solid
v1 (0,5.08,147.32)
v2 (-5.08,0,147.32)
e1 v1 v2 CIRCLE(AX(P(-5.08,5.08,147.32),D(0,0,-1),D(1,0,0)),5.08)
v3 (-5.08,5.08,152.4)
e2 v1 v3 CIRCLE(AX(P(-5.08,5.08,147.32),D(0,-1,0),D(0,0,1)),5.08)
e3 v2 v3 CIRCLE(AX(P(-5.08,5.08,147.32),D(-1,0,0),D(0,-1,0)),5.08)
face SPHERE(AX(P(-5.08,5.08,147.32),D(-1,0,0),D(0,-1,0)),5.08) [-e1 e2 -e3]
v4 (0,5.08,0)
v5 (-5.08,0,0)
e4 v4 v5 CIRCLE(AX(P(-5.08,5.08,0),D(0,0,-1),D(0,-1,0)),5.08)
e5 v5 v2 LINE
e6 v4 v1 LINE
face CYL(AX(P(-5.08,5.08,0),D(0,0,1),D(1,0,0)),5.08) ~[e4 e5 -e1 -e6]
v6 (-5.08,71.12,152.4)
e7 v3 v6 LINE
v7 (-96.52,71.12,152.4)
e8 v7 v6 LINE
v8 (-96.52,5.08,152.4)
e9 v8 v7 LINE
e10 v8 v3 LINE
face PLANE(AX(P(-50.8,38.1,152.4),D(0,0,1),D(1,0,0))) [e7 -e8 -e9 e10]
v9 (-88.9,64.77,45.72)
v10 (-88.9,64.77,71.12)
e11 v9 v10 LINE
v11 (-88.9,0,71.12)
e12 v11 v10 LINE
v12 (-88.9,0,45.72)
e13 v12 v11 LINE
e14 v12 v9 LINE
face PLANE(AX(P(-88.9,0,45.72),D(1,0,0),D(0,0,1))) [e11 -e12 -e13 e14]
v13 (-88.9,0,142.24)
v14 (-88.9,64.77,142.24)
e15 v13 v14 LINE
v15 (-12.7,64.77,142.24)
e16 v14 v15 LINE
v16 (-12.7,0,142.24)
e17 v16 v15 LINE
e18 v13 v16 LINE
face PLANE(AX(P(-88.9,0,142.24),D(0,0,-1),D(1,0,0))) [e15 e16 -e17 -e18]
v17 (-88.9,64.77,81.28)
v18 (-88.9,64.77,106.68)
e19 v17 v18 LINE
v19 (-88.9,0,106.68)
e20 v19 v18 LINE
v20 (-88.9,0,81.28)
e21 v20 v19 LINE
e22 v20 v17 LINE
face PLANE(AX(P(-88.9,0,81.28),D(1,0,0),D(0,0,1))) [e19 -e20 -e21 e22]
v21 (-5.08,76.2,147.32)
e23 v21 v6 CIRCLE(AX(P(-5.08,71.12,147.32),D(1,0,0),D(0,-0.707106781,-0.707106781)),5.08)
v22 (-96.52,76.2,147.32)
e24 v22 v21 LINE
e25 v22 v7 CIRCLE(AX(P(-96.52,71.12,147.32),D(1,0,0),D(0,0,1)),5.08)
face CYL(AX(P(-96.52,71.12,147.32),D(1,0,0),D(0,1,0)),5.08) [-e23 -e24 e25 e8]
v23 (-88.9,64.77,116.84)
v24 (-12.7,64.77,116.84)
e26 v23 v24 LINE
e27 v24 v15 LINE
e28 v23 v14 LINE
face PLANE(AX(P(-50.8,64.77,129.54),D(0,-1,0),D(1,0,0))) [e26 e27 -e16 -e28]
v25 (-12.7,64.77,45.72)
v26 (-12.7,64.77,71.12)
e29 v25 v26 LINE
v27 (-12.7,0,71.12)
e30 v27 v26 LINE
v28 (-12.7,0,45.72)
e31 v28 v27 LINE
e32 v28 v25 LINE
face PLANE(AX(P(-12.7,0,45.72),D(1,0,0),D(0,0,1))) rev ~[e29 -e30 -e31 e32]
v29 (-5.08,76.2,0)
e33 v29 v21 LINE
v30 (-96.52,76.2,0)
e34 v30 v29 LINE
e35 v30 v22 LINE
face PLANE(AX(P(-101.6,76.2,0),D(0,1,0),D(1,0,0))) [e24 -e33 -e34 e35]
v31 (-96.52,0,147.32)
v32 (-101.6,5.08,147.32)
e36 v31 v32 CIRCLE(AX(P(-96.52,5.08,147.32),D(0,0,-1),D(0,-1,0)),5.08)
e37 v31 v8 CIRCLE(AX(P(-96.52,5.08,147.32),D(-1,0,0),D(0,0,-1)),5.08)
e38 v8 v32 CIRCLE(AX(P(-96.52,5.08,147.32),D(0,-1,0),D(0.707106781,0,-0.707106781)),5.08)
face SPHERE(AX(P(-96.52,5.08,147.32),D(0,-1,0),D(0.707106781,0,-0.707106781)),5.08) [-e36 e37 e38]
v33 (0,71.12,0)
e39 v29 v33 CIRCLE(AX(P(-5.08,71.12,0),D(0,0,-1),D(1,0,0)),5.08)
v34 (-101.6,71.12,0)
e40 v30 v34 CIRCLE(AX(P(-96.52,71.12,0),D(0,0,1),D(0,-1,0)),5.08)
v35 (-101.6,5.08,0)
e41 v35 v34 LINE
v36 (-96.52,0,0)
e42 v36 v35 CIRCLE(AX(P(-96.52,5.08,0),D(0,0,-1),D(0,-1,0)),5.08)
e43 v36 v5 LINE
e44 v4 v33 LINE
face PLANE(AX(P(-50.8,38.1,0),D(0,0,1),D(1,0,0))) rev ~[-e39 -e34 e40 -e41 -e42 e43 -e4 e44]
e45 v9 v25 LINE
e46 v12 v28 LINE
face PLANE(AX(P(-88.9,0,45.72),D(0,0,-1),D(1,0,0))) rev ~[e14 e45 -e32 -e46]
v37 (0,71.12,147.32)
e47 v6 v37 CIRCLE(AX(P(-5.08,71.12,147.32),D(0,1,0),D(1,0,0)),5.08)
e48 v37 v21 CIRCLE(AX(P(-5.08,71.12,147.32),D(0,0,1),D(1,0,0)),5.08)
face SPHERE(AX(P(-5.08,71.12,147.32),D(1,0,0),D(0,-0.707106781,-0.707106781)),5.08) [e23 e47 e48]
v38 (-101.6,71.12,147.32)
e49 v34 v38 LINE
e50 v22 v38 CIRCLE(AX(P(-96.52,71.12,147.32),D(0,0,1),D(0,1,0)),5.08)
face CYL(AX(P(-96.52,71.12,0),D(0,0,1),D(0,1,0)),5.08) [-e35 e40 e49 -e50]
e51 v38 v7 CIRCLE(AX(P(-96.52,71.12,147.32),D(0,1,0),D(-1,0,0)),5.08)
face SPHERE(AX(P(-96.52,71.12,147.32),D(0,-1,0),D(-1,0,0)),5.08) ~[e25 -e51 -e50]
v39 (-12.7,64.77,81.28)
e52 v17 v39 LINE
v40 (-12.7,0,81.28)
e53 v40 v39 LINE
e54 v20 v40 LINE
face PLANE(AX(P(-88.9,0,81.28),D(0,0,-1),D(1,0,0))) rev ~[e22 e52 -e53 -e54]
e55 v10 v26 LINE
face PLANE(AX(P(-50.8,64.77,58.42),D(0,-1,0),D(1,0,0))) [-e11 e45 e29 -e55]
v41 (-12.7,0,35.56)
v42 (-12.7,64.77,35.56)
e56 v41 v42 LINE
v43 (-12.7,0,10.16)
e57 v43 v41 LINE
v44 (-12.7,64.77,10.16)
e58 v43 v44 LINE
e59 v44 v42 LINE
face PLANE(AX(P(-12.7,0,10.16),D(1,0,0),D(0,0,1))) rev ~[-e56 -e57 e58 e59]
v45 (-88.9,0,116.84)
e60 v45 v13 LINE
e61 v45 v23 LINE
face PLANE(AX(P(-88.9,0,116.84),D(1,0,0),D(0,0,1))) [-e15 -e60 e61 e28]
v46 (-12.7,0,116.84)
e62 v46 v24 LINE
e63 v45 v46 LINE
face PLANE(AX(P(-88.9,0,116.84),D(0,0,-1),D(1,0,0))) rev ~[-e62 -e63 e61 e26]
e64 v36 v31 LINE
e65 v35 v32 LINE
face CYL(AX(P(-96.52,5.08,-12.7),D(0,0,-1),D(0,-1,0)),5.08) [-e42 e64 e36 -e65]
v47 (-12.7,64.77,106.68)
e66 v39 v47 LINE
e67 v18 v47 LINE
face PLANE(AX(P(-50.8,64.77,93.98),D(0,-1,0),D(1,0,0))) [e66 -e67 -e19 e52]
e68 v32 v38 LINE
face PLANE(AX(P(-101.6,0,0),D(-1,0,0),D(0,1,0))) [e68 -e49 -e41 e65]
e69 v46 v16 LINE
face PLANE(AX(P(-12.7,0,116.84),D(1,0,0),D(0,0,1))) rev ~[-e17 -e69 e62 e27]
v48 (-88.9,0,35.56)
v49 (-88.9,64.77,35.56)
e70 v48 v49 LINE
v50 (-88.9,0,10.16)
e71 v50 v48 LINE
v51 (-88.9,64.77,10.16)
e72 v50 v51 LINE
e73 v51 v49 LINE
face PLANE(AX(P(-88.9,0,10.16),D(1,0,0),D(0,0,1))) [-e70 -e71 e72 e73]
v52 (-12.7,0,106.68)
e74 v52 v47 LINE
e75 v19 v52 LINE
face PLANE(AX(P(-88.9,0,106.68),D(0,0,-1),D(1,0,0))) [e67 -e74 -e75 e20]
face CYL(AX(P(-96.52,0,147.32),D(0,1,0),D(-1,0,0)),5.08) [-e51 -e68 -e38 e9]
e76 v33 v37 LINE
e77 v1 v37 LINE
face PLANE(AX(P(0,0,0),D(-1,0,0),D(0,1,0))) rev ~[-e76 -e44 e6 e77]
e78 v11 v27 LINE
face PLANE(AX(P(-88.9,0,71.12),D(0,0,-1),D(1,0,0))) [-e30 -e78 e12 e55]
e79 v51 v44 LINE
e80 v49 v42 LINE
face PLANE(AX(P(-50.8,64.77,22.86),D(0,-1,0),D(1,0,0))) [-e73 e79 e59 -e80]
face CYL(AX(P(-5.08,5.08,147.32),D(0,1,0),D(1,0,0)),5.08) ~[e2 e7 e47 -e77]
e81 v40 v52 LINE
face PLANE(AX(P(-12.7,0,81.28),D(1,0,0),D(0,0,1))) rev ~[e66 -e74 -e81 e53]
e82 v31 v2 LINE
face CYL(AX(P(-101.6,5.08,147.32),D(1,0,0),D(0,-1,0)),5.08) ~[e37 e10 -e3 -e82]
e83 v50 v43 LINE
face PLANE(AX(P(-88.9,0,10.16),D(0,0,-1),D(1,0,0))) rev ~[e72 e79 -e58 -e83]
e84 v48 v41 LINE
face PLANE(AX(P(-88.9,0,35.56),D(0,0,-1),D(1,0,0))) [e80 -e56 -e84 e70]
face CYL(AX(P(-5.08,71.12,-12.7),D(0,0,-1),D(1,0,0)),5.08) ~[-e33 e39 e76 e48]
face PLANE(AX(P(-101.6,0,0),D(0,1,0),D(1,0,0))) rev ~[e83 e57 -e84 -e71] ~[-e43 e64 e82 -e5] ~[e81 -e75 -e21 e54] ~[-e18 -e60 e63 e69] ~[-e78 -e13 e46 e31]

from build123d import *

# Parameters (mm, degrees)
F0_W         = 101.6
F0_H         = 76.2
F1_DEPTH     = 152.4
F2_W         = 76.2
F2_H         = 25.4
F3_DEPTH     = 64.77
F4_R         = 5.08
F5_R         = 5.08
F6_T1_DEPTH  = 160.02
F6_S5_W      = 5.08
F6_S5_H      = 5.08
F6_T6_DEPTH  = 5.08
F6_S11_W     = 5.08
F6_S11_H     = 5.08
F6_T12_DEPTH = 5.08


# Not quite as in the source:
# - a fillet or chamfer that OpenCascade refuses, or shapes differently, is made with other operations: its cross-section is extruded or revolved along the edge and cut away or added


with BuildPart() as f1:
    # F0 (on Top) → F1 (new body)
    with BuildSketch(Plane.XY):
        with Locations((-50.8, 38.1)):
            Rectangle(F0_W, F0_H)
    extrude(amount=F1_DEPTH)

    # F2 (on face) → F3 (cut)
    with BuildSketch(Plane.XZ):
        with Locations((-50.8, 129.54)):
            Rectangle(F2_W, F2_H)
        with Locations((-50.8, 93.98)):
            Rectangle(F2_W, F2_H)
        with Locations((-50.8, 58.42)):
            Rectangle(F2_W, F2_H)
        with Locations((-50.8, 22.86)):
            Rectangle(F2_W, F2_H)
    extrude(amount=-F3_DEPTH, mode=Mode.SUBTRACT)

    # F4
    f4_edges = [f1.edges().sort_by_distance(p)[0] for p in [
        (-50.8, 0, 152.4),
        (-101.6, 38.1, 152.4),
    ]]
    fillet(f4_edges, radius=F4_R)

    # F5
    f5_edges = [f1.edges().sort_by_distance(p)[0] for p in [
        (0, 40.64, 152.4),
        (-48.26, 76.2, 152.4),
    ]]
    fillet(f5_edges, radius=F5_R)

    # F6: fillet of radius 5.08 on 2 edges, made by hand

    # F6_s2 → F6_t1 (cut)
    with BuildSketch(Plane.XY.offset(-12.7)):
        with BuildLine():
            ThreePointArc((0, 71.12), (-1.4878975516, 74.7121024484), (-5.08, 76.2))
            Line((-5.08, 76.2), (0, 76.2))
            Line((0, 76.2), (0, 71.12))
        make_face()
        with BuildLine():
            ThreePointArc((-96.52, 0), (-100.1121024484, 1.4878975516), (-101.6, 5.08))
            Line((-101.6, 5.08), (-101.6, 0))
            Line((-101.6, 0), (-96.52, 0))
        make_face()
    extrude(amount=F6_T1_DEPTH, mode=Mode.SUBTRACT)


with BuildPart() as f6_tool4:
    # F6_s5 → F6_t6 (new body)
    with BuildSketch(Plane.XZ.offset(-5.08)):
        with Locations((-99.06, 149.86)):
            Rectangle(F6_S5_W, F6_S5_H)
    extrude(amount=F6_T6_DEPTH)

    # F6_s7 → F6_t8 (revolve, cut)
    with BuildSketch(Plane(origin=(-96.52, 5.08, 147.32), x_dir=(0.7071067812, 0, -0.7071067812), z_dir=(-0.7071067812, 0, -0.7071067812))):
        with BuildLine():
            ThreePointArc((0, -5.08), (5.08, 0), (0, 5.08))
            Line((0, 5.08), (0, -5.08))
        make_face()
    revolve(axis=Axis((-96.52, 5.08, 147.32), (0, -1, 0)), mode=Mode.SUBTRACT)


with BuildPart() as f1_1:
    add(f1.part)

    # F6_t3: cut F6_tool4
    add(f6_tool4.part, mode=Mode.SUBTRACT)


with BuildPart() as f6_tool10:
    # F6_s11 → F6_t12 (new body)
    with BuildSketch(Plane.YZ.offset(-5.08)):
        with Locations((73.66, 149.86)):
            Rectangle(F6_S11_W, F6_S11_H)
    extrude(amount=F6_T12_DEPTH)

    # F6_s13 → F6_t14 (revolve, cut)
    with BuildSketch(Plane(origin=(-5.08, 71.12, 147.32), x_dir=(0, -0.7071067812, -0.7071067812), z_dir=(0, -0.7071067812, 0.7071067812))):
        with BuildLine():
            ThreePointArc((0, -5.08), (5.08, 0), (0, 5.08))
            Line((0, 5.08), (0, -5.08))
        make_face()
    revolve(axis=Axis((-5.08, 71.12, 147.32), (1, 0, 0)), mode=Mode.SUBTRACT)


with BuildPart() as f1_2:
    add(f1_1.part)

    # F6_t9: cut F6_tool10
    add(f6_tool10.part, mode=Mode.SUBTRACT)


solid = f1_2.part
